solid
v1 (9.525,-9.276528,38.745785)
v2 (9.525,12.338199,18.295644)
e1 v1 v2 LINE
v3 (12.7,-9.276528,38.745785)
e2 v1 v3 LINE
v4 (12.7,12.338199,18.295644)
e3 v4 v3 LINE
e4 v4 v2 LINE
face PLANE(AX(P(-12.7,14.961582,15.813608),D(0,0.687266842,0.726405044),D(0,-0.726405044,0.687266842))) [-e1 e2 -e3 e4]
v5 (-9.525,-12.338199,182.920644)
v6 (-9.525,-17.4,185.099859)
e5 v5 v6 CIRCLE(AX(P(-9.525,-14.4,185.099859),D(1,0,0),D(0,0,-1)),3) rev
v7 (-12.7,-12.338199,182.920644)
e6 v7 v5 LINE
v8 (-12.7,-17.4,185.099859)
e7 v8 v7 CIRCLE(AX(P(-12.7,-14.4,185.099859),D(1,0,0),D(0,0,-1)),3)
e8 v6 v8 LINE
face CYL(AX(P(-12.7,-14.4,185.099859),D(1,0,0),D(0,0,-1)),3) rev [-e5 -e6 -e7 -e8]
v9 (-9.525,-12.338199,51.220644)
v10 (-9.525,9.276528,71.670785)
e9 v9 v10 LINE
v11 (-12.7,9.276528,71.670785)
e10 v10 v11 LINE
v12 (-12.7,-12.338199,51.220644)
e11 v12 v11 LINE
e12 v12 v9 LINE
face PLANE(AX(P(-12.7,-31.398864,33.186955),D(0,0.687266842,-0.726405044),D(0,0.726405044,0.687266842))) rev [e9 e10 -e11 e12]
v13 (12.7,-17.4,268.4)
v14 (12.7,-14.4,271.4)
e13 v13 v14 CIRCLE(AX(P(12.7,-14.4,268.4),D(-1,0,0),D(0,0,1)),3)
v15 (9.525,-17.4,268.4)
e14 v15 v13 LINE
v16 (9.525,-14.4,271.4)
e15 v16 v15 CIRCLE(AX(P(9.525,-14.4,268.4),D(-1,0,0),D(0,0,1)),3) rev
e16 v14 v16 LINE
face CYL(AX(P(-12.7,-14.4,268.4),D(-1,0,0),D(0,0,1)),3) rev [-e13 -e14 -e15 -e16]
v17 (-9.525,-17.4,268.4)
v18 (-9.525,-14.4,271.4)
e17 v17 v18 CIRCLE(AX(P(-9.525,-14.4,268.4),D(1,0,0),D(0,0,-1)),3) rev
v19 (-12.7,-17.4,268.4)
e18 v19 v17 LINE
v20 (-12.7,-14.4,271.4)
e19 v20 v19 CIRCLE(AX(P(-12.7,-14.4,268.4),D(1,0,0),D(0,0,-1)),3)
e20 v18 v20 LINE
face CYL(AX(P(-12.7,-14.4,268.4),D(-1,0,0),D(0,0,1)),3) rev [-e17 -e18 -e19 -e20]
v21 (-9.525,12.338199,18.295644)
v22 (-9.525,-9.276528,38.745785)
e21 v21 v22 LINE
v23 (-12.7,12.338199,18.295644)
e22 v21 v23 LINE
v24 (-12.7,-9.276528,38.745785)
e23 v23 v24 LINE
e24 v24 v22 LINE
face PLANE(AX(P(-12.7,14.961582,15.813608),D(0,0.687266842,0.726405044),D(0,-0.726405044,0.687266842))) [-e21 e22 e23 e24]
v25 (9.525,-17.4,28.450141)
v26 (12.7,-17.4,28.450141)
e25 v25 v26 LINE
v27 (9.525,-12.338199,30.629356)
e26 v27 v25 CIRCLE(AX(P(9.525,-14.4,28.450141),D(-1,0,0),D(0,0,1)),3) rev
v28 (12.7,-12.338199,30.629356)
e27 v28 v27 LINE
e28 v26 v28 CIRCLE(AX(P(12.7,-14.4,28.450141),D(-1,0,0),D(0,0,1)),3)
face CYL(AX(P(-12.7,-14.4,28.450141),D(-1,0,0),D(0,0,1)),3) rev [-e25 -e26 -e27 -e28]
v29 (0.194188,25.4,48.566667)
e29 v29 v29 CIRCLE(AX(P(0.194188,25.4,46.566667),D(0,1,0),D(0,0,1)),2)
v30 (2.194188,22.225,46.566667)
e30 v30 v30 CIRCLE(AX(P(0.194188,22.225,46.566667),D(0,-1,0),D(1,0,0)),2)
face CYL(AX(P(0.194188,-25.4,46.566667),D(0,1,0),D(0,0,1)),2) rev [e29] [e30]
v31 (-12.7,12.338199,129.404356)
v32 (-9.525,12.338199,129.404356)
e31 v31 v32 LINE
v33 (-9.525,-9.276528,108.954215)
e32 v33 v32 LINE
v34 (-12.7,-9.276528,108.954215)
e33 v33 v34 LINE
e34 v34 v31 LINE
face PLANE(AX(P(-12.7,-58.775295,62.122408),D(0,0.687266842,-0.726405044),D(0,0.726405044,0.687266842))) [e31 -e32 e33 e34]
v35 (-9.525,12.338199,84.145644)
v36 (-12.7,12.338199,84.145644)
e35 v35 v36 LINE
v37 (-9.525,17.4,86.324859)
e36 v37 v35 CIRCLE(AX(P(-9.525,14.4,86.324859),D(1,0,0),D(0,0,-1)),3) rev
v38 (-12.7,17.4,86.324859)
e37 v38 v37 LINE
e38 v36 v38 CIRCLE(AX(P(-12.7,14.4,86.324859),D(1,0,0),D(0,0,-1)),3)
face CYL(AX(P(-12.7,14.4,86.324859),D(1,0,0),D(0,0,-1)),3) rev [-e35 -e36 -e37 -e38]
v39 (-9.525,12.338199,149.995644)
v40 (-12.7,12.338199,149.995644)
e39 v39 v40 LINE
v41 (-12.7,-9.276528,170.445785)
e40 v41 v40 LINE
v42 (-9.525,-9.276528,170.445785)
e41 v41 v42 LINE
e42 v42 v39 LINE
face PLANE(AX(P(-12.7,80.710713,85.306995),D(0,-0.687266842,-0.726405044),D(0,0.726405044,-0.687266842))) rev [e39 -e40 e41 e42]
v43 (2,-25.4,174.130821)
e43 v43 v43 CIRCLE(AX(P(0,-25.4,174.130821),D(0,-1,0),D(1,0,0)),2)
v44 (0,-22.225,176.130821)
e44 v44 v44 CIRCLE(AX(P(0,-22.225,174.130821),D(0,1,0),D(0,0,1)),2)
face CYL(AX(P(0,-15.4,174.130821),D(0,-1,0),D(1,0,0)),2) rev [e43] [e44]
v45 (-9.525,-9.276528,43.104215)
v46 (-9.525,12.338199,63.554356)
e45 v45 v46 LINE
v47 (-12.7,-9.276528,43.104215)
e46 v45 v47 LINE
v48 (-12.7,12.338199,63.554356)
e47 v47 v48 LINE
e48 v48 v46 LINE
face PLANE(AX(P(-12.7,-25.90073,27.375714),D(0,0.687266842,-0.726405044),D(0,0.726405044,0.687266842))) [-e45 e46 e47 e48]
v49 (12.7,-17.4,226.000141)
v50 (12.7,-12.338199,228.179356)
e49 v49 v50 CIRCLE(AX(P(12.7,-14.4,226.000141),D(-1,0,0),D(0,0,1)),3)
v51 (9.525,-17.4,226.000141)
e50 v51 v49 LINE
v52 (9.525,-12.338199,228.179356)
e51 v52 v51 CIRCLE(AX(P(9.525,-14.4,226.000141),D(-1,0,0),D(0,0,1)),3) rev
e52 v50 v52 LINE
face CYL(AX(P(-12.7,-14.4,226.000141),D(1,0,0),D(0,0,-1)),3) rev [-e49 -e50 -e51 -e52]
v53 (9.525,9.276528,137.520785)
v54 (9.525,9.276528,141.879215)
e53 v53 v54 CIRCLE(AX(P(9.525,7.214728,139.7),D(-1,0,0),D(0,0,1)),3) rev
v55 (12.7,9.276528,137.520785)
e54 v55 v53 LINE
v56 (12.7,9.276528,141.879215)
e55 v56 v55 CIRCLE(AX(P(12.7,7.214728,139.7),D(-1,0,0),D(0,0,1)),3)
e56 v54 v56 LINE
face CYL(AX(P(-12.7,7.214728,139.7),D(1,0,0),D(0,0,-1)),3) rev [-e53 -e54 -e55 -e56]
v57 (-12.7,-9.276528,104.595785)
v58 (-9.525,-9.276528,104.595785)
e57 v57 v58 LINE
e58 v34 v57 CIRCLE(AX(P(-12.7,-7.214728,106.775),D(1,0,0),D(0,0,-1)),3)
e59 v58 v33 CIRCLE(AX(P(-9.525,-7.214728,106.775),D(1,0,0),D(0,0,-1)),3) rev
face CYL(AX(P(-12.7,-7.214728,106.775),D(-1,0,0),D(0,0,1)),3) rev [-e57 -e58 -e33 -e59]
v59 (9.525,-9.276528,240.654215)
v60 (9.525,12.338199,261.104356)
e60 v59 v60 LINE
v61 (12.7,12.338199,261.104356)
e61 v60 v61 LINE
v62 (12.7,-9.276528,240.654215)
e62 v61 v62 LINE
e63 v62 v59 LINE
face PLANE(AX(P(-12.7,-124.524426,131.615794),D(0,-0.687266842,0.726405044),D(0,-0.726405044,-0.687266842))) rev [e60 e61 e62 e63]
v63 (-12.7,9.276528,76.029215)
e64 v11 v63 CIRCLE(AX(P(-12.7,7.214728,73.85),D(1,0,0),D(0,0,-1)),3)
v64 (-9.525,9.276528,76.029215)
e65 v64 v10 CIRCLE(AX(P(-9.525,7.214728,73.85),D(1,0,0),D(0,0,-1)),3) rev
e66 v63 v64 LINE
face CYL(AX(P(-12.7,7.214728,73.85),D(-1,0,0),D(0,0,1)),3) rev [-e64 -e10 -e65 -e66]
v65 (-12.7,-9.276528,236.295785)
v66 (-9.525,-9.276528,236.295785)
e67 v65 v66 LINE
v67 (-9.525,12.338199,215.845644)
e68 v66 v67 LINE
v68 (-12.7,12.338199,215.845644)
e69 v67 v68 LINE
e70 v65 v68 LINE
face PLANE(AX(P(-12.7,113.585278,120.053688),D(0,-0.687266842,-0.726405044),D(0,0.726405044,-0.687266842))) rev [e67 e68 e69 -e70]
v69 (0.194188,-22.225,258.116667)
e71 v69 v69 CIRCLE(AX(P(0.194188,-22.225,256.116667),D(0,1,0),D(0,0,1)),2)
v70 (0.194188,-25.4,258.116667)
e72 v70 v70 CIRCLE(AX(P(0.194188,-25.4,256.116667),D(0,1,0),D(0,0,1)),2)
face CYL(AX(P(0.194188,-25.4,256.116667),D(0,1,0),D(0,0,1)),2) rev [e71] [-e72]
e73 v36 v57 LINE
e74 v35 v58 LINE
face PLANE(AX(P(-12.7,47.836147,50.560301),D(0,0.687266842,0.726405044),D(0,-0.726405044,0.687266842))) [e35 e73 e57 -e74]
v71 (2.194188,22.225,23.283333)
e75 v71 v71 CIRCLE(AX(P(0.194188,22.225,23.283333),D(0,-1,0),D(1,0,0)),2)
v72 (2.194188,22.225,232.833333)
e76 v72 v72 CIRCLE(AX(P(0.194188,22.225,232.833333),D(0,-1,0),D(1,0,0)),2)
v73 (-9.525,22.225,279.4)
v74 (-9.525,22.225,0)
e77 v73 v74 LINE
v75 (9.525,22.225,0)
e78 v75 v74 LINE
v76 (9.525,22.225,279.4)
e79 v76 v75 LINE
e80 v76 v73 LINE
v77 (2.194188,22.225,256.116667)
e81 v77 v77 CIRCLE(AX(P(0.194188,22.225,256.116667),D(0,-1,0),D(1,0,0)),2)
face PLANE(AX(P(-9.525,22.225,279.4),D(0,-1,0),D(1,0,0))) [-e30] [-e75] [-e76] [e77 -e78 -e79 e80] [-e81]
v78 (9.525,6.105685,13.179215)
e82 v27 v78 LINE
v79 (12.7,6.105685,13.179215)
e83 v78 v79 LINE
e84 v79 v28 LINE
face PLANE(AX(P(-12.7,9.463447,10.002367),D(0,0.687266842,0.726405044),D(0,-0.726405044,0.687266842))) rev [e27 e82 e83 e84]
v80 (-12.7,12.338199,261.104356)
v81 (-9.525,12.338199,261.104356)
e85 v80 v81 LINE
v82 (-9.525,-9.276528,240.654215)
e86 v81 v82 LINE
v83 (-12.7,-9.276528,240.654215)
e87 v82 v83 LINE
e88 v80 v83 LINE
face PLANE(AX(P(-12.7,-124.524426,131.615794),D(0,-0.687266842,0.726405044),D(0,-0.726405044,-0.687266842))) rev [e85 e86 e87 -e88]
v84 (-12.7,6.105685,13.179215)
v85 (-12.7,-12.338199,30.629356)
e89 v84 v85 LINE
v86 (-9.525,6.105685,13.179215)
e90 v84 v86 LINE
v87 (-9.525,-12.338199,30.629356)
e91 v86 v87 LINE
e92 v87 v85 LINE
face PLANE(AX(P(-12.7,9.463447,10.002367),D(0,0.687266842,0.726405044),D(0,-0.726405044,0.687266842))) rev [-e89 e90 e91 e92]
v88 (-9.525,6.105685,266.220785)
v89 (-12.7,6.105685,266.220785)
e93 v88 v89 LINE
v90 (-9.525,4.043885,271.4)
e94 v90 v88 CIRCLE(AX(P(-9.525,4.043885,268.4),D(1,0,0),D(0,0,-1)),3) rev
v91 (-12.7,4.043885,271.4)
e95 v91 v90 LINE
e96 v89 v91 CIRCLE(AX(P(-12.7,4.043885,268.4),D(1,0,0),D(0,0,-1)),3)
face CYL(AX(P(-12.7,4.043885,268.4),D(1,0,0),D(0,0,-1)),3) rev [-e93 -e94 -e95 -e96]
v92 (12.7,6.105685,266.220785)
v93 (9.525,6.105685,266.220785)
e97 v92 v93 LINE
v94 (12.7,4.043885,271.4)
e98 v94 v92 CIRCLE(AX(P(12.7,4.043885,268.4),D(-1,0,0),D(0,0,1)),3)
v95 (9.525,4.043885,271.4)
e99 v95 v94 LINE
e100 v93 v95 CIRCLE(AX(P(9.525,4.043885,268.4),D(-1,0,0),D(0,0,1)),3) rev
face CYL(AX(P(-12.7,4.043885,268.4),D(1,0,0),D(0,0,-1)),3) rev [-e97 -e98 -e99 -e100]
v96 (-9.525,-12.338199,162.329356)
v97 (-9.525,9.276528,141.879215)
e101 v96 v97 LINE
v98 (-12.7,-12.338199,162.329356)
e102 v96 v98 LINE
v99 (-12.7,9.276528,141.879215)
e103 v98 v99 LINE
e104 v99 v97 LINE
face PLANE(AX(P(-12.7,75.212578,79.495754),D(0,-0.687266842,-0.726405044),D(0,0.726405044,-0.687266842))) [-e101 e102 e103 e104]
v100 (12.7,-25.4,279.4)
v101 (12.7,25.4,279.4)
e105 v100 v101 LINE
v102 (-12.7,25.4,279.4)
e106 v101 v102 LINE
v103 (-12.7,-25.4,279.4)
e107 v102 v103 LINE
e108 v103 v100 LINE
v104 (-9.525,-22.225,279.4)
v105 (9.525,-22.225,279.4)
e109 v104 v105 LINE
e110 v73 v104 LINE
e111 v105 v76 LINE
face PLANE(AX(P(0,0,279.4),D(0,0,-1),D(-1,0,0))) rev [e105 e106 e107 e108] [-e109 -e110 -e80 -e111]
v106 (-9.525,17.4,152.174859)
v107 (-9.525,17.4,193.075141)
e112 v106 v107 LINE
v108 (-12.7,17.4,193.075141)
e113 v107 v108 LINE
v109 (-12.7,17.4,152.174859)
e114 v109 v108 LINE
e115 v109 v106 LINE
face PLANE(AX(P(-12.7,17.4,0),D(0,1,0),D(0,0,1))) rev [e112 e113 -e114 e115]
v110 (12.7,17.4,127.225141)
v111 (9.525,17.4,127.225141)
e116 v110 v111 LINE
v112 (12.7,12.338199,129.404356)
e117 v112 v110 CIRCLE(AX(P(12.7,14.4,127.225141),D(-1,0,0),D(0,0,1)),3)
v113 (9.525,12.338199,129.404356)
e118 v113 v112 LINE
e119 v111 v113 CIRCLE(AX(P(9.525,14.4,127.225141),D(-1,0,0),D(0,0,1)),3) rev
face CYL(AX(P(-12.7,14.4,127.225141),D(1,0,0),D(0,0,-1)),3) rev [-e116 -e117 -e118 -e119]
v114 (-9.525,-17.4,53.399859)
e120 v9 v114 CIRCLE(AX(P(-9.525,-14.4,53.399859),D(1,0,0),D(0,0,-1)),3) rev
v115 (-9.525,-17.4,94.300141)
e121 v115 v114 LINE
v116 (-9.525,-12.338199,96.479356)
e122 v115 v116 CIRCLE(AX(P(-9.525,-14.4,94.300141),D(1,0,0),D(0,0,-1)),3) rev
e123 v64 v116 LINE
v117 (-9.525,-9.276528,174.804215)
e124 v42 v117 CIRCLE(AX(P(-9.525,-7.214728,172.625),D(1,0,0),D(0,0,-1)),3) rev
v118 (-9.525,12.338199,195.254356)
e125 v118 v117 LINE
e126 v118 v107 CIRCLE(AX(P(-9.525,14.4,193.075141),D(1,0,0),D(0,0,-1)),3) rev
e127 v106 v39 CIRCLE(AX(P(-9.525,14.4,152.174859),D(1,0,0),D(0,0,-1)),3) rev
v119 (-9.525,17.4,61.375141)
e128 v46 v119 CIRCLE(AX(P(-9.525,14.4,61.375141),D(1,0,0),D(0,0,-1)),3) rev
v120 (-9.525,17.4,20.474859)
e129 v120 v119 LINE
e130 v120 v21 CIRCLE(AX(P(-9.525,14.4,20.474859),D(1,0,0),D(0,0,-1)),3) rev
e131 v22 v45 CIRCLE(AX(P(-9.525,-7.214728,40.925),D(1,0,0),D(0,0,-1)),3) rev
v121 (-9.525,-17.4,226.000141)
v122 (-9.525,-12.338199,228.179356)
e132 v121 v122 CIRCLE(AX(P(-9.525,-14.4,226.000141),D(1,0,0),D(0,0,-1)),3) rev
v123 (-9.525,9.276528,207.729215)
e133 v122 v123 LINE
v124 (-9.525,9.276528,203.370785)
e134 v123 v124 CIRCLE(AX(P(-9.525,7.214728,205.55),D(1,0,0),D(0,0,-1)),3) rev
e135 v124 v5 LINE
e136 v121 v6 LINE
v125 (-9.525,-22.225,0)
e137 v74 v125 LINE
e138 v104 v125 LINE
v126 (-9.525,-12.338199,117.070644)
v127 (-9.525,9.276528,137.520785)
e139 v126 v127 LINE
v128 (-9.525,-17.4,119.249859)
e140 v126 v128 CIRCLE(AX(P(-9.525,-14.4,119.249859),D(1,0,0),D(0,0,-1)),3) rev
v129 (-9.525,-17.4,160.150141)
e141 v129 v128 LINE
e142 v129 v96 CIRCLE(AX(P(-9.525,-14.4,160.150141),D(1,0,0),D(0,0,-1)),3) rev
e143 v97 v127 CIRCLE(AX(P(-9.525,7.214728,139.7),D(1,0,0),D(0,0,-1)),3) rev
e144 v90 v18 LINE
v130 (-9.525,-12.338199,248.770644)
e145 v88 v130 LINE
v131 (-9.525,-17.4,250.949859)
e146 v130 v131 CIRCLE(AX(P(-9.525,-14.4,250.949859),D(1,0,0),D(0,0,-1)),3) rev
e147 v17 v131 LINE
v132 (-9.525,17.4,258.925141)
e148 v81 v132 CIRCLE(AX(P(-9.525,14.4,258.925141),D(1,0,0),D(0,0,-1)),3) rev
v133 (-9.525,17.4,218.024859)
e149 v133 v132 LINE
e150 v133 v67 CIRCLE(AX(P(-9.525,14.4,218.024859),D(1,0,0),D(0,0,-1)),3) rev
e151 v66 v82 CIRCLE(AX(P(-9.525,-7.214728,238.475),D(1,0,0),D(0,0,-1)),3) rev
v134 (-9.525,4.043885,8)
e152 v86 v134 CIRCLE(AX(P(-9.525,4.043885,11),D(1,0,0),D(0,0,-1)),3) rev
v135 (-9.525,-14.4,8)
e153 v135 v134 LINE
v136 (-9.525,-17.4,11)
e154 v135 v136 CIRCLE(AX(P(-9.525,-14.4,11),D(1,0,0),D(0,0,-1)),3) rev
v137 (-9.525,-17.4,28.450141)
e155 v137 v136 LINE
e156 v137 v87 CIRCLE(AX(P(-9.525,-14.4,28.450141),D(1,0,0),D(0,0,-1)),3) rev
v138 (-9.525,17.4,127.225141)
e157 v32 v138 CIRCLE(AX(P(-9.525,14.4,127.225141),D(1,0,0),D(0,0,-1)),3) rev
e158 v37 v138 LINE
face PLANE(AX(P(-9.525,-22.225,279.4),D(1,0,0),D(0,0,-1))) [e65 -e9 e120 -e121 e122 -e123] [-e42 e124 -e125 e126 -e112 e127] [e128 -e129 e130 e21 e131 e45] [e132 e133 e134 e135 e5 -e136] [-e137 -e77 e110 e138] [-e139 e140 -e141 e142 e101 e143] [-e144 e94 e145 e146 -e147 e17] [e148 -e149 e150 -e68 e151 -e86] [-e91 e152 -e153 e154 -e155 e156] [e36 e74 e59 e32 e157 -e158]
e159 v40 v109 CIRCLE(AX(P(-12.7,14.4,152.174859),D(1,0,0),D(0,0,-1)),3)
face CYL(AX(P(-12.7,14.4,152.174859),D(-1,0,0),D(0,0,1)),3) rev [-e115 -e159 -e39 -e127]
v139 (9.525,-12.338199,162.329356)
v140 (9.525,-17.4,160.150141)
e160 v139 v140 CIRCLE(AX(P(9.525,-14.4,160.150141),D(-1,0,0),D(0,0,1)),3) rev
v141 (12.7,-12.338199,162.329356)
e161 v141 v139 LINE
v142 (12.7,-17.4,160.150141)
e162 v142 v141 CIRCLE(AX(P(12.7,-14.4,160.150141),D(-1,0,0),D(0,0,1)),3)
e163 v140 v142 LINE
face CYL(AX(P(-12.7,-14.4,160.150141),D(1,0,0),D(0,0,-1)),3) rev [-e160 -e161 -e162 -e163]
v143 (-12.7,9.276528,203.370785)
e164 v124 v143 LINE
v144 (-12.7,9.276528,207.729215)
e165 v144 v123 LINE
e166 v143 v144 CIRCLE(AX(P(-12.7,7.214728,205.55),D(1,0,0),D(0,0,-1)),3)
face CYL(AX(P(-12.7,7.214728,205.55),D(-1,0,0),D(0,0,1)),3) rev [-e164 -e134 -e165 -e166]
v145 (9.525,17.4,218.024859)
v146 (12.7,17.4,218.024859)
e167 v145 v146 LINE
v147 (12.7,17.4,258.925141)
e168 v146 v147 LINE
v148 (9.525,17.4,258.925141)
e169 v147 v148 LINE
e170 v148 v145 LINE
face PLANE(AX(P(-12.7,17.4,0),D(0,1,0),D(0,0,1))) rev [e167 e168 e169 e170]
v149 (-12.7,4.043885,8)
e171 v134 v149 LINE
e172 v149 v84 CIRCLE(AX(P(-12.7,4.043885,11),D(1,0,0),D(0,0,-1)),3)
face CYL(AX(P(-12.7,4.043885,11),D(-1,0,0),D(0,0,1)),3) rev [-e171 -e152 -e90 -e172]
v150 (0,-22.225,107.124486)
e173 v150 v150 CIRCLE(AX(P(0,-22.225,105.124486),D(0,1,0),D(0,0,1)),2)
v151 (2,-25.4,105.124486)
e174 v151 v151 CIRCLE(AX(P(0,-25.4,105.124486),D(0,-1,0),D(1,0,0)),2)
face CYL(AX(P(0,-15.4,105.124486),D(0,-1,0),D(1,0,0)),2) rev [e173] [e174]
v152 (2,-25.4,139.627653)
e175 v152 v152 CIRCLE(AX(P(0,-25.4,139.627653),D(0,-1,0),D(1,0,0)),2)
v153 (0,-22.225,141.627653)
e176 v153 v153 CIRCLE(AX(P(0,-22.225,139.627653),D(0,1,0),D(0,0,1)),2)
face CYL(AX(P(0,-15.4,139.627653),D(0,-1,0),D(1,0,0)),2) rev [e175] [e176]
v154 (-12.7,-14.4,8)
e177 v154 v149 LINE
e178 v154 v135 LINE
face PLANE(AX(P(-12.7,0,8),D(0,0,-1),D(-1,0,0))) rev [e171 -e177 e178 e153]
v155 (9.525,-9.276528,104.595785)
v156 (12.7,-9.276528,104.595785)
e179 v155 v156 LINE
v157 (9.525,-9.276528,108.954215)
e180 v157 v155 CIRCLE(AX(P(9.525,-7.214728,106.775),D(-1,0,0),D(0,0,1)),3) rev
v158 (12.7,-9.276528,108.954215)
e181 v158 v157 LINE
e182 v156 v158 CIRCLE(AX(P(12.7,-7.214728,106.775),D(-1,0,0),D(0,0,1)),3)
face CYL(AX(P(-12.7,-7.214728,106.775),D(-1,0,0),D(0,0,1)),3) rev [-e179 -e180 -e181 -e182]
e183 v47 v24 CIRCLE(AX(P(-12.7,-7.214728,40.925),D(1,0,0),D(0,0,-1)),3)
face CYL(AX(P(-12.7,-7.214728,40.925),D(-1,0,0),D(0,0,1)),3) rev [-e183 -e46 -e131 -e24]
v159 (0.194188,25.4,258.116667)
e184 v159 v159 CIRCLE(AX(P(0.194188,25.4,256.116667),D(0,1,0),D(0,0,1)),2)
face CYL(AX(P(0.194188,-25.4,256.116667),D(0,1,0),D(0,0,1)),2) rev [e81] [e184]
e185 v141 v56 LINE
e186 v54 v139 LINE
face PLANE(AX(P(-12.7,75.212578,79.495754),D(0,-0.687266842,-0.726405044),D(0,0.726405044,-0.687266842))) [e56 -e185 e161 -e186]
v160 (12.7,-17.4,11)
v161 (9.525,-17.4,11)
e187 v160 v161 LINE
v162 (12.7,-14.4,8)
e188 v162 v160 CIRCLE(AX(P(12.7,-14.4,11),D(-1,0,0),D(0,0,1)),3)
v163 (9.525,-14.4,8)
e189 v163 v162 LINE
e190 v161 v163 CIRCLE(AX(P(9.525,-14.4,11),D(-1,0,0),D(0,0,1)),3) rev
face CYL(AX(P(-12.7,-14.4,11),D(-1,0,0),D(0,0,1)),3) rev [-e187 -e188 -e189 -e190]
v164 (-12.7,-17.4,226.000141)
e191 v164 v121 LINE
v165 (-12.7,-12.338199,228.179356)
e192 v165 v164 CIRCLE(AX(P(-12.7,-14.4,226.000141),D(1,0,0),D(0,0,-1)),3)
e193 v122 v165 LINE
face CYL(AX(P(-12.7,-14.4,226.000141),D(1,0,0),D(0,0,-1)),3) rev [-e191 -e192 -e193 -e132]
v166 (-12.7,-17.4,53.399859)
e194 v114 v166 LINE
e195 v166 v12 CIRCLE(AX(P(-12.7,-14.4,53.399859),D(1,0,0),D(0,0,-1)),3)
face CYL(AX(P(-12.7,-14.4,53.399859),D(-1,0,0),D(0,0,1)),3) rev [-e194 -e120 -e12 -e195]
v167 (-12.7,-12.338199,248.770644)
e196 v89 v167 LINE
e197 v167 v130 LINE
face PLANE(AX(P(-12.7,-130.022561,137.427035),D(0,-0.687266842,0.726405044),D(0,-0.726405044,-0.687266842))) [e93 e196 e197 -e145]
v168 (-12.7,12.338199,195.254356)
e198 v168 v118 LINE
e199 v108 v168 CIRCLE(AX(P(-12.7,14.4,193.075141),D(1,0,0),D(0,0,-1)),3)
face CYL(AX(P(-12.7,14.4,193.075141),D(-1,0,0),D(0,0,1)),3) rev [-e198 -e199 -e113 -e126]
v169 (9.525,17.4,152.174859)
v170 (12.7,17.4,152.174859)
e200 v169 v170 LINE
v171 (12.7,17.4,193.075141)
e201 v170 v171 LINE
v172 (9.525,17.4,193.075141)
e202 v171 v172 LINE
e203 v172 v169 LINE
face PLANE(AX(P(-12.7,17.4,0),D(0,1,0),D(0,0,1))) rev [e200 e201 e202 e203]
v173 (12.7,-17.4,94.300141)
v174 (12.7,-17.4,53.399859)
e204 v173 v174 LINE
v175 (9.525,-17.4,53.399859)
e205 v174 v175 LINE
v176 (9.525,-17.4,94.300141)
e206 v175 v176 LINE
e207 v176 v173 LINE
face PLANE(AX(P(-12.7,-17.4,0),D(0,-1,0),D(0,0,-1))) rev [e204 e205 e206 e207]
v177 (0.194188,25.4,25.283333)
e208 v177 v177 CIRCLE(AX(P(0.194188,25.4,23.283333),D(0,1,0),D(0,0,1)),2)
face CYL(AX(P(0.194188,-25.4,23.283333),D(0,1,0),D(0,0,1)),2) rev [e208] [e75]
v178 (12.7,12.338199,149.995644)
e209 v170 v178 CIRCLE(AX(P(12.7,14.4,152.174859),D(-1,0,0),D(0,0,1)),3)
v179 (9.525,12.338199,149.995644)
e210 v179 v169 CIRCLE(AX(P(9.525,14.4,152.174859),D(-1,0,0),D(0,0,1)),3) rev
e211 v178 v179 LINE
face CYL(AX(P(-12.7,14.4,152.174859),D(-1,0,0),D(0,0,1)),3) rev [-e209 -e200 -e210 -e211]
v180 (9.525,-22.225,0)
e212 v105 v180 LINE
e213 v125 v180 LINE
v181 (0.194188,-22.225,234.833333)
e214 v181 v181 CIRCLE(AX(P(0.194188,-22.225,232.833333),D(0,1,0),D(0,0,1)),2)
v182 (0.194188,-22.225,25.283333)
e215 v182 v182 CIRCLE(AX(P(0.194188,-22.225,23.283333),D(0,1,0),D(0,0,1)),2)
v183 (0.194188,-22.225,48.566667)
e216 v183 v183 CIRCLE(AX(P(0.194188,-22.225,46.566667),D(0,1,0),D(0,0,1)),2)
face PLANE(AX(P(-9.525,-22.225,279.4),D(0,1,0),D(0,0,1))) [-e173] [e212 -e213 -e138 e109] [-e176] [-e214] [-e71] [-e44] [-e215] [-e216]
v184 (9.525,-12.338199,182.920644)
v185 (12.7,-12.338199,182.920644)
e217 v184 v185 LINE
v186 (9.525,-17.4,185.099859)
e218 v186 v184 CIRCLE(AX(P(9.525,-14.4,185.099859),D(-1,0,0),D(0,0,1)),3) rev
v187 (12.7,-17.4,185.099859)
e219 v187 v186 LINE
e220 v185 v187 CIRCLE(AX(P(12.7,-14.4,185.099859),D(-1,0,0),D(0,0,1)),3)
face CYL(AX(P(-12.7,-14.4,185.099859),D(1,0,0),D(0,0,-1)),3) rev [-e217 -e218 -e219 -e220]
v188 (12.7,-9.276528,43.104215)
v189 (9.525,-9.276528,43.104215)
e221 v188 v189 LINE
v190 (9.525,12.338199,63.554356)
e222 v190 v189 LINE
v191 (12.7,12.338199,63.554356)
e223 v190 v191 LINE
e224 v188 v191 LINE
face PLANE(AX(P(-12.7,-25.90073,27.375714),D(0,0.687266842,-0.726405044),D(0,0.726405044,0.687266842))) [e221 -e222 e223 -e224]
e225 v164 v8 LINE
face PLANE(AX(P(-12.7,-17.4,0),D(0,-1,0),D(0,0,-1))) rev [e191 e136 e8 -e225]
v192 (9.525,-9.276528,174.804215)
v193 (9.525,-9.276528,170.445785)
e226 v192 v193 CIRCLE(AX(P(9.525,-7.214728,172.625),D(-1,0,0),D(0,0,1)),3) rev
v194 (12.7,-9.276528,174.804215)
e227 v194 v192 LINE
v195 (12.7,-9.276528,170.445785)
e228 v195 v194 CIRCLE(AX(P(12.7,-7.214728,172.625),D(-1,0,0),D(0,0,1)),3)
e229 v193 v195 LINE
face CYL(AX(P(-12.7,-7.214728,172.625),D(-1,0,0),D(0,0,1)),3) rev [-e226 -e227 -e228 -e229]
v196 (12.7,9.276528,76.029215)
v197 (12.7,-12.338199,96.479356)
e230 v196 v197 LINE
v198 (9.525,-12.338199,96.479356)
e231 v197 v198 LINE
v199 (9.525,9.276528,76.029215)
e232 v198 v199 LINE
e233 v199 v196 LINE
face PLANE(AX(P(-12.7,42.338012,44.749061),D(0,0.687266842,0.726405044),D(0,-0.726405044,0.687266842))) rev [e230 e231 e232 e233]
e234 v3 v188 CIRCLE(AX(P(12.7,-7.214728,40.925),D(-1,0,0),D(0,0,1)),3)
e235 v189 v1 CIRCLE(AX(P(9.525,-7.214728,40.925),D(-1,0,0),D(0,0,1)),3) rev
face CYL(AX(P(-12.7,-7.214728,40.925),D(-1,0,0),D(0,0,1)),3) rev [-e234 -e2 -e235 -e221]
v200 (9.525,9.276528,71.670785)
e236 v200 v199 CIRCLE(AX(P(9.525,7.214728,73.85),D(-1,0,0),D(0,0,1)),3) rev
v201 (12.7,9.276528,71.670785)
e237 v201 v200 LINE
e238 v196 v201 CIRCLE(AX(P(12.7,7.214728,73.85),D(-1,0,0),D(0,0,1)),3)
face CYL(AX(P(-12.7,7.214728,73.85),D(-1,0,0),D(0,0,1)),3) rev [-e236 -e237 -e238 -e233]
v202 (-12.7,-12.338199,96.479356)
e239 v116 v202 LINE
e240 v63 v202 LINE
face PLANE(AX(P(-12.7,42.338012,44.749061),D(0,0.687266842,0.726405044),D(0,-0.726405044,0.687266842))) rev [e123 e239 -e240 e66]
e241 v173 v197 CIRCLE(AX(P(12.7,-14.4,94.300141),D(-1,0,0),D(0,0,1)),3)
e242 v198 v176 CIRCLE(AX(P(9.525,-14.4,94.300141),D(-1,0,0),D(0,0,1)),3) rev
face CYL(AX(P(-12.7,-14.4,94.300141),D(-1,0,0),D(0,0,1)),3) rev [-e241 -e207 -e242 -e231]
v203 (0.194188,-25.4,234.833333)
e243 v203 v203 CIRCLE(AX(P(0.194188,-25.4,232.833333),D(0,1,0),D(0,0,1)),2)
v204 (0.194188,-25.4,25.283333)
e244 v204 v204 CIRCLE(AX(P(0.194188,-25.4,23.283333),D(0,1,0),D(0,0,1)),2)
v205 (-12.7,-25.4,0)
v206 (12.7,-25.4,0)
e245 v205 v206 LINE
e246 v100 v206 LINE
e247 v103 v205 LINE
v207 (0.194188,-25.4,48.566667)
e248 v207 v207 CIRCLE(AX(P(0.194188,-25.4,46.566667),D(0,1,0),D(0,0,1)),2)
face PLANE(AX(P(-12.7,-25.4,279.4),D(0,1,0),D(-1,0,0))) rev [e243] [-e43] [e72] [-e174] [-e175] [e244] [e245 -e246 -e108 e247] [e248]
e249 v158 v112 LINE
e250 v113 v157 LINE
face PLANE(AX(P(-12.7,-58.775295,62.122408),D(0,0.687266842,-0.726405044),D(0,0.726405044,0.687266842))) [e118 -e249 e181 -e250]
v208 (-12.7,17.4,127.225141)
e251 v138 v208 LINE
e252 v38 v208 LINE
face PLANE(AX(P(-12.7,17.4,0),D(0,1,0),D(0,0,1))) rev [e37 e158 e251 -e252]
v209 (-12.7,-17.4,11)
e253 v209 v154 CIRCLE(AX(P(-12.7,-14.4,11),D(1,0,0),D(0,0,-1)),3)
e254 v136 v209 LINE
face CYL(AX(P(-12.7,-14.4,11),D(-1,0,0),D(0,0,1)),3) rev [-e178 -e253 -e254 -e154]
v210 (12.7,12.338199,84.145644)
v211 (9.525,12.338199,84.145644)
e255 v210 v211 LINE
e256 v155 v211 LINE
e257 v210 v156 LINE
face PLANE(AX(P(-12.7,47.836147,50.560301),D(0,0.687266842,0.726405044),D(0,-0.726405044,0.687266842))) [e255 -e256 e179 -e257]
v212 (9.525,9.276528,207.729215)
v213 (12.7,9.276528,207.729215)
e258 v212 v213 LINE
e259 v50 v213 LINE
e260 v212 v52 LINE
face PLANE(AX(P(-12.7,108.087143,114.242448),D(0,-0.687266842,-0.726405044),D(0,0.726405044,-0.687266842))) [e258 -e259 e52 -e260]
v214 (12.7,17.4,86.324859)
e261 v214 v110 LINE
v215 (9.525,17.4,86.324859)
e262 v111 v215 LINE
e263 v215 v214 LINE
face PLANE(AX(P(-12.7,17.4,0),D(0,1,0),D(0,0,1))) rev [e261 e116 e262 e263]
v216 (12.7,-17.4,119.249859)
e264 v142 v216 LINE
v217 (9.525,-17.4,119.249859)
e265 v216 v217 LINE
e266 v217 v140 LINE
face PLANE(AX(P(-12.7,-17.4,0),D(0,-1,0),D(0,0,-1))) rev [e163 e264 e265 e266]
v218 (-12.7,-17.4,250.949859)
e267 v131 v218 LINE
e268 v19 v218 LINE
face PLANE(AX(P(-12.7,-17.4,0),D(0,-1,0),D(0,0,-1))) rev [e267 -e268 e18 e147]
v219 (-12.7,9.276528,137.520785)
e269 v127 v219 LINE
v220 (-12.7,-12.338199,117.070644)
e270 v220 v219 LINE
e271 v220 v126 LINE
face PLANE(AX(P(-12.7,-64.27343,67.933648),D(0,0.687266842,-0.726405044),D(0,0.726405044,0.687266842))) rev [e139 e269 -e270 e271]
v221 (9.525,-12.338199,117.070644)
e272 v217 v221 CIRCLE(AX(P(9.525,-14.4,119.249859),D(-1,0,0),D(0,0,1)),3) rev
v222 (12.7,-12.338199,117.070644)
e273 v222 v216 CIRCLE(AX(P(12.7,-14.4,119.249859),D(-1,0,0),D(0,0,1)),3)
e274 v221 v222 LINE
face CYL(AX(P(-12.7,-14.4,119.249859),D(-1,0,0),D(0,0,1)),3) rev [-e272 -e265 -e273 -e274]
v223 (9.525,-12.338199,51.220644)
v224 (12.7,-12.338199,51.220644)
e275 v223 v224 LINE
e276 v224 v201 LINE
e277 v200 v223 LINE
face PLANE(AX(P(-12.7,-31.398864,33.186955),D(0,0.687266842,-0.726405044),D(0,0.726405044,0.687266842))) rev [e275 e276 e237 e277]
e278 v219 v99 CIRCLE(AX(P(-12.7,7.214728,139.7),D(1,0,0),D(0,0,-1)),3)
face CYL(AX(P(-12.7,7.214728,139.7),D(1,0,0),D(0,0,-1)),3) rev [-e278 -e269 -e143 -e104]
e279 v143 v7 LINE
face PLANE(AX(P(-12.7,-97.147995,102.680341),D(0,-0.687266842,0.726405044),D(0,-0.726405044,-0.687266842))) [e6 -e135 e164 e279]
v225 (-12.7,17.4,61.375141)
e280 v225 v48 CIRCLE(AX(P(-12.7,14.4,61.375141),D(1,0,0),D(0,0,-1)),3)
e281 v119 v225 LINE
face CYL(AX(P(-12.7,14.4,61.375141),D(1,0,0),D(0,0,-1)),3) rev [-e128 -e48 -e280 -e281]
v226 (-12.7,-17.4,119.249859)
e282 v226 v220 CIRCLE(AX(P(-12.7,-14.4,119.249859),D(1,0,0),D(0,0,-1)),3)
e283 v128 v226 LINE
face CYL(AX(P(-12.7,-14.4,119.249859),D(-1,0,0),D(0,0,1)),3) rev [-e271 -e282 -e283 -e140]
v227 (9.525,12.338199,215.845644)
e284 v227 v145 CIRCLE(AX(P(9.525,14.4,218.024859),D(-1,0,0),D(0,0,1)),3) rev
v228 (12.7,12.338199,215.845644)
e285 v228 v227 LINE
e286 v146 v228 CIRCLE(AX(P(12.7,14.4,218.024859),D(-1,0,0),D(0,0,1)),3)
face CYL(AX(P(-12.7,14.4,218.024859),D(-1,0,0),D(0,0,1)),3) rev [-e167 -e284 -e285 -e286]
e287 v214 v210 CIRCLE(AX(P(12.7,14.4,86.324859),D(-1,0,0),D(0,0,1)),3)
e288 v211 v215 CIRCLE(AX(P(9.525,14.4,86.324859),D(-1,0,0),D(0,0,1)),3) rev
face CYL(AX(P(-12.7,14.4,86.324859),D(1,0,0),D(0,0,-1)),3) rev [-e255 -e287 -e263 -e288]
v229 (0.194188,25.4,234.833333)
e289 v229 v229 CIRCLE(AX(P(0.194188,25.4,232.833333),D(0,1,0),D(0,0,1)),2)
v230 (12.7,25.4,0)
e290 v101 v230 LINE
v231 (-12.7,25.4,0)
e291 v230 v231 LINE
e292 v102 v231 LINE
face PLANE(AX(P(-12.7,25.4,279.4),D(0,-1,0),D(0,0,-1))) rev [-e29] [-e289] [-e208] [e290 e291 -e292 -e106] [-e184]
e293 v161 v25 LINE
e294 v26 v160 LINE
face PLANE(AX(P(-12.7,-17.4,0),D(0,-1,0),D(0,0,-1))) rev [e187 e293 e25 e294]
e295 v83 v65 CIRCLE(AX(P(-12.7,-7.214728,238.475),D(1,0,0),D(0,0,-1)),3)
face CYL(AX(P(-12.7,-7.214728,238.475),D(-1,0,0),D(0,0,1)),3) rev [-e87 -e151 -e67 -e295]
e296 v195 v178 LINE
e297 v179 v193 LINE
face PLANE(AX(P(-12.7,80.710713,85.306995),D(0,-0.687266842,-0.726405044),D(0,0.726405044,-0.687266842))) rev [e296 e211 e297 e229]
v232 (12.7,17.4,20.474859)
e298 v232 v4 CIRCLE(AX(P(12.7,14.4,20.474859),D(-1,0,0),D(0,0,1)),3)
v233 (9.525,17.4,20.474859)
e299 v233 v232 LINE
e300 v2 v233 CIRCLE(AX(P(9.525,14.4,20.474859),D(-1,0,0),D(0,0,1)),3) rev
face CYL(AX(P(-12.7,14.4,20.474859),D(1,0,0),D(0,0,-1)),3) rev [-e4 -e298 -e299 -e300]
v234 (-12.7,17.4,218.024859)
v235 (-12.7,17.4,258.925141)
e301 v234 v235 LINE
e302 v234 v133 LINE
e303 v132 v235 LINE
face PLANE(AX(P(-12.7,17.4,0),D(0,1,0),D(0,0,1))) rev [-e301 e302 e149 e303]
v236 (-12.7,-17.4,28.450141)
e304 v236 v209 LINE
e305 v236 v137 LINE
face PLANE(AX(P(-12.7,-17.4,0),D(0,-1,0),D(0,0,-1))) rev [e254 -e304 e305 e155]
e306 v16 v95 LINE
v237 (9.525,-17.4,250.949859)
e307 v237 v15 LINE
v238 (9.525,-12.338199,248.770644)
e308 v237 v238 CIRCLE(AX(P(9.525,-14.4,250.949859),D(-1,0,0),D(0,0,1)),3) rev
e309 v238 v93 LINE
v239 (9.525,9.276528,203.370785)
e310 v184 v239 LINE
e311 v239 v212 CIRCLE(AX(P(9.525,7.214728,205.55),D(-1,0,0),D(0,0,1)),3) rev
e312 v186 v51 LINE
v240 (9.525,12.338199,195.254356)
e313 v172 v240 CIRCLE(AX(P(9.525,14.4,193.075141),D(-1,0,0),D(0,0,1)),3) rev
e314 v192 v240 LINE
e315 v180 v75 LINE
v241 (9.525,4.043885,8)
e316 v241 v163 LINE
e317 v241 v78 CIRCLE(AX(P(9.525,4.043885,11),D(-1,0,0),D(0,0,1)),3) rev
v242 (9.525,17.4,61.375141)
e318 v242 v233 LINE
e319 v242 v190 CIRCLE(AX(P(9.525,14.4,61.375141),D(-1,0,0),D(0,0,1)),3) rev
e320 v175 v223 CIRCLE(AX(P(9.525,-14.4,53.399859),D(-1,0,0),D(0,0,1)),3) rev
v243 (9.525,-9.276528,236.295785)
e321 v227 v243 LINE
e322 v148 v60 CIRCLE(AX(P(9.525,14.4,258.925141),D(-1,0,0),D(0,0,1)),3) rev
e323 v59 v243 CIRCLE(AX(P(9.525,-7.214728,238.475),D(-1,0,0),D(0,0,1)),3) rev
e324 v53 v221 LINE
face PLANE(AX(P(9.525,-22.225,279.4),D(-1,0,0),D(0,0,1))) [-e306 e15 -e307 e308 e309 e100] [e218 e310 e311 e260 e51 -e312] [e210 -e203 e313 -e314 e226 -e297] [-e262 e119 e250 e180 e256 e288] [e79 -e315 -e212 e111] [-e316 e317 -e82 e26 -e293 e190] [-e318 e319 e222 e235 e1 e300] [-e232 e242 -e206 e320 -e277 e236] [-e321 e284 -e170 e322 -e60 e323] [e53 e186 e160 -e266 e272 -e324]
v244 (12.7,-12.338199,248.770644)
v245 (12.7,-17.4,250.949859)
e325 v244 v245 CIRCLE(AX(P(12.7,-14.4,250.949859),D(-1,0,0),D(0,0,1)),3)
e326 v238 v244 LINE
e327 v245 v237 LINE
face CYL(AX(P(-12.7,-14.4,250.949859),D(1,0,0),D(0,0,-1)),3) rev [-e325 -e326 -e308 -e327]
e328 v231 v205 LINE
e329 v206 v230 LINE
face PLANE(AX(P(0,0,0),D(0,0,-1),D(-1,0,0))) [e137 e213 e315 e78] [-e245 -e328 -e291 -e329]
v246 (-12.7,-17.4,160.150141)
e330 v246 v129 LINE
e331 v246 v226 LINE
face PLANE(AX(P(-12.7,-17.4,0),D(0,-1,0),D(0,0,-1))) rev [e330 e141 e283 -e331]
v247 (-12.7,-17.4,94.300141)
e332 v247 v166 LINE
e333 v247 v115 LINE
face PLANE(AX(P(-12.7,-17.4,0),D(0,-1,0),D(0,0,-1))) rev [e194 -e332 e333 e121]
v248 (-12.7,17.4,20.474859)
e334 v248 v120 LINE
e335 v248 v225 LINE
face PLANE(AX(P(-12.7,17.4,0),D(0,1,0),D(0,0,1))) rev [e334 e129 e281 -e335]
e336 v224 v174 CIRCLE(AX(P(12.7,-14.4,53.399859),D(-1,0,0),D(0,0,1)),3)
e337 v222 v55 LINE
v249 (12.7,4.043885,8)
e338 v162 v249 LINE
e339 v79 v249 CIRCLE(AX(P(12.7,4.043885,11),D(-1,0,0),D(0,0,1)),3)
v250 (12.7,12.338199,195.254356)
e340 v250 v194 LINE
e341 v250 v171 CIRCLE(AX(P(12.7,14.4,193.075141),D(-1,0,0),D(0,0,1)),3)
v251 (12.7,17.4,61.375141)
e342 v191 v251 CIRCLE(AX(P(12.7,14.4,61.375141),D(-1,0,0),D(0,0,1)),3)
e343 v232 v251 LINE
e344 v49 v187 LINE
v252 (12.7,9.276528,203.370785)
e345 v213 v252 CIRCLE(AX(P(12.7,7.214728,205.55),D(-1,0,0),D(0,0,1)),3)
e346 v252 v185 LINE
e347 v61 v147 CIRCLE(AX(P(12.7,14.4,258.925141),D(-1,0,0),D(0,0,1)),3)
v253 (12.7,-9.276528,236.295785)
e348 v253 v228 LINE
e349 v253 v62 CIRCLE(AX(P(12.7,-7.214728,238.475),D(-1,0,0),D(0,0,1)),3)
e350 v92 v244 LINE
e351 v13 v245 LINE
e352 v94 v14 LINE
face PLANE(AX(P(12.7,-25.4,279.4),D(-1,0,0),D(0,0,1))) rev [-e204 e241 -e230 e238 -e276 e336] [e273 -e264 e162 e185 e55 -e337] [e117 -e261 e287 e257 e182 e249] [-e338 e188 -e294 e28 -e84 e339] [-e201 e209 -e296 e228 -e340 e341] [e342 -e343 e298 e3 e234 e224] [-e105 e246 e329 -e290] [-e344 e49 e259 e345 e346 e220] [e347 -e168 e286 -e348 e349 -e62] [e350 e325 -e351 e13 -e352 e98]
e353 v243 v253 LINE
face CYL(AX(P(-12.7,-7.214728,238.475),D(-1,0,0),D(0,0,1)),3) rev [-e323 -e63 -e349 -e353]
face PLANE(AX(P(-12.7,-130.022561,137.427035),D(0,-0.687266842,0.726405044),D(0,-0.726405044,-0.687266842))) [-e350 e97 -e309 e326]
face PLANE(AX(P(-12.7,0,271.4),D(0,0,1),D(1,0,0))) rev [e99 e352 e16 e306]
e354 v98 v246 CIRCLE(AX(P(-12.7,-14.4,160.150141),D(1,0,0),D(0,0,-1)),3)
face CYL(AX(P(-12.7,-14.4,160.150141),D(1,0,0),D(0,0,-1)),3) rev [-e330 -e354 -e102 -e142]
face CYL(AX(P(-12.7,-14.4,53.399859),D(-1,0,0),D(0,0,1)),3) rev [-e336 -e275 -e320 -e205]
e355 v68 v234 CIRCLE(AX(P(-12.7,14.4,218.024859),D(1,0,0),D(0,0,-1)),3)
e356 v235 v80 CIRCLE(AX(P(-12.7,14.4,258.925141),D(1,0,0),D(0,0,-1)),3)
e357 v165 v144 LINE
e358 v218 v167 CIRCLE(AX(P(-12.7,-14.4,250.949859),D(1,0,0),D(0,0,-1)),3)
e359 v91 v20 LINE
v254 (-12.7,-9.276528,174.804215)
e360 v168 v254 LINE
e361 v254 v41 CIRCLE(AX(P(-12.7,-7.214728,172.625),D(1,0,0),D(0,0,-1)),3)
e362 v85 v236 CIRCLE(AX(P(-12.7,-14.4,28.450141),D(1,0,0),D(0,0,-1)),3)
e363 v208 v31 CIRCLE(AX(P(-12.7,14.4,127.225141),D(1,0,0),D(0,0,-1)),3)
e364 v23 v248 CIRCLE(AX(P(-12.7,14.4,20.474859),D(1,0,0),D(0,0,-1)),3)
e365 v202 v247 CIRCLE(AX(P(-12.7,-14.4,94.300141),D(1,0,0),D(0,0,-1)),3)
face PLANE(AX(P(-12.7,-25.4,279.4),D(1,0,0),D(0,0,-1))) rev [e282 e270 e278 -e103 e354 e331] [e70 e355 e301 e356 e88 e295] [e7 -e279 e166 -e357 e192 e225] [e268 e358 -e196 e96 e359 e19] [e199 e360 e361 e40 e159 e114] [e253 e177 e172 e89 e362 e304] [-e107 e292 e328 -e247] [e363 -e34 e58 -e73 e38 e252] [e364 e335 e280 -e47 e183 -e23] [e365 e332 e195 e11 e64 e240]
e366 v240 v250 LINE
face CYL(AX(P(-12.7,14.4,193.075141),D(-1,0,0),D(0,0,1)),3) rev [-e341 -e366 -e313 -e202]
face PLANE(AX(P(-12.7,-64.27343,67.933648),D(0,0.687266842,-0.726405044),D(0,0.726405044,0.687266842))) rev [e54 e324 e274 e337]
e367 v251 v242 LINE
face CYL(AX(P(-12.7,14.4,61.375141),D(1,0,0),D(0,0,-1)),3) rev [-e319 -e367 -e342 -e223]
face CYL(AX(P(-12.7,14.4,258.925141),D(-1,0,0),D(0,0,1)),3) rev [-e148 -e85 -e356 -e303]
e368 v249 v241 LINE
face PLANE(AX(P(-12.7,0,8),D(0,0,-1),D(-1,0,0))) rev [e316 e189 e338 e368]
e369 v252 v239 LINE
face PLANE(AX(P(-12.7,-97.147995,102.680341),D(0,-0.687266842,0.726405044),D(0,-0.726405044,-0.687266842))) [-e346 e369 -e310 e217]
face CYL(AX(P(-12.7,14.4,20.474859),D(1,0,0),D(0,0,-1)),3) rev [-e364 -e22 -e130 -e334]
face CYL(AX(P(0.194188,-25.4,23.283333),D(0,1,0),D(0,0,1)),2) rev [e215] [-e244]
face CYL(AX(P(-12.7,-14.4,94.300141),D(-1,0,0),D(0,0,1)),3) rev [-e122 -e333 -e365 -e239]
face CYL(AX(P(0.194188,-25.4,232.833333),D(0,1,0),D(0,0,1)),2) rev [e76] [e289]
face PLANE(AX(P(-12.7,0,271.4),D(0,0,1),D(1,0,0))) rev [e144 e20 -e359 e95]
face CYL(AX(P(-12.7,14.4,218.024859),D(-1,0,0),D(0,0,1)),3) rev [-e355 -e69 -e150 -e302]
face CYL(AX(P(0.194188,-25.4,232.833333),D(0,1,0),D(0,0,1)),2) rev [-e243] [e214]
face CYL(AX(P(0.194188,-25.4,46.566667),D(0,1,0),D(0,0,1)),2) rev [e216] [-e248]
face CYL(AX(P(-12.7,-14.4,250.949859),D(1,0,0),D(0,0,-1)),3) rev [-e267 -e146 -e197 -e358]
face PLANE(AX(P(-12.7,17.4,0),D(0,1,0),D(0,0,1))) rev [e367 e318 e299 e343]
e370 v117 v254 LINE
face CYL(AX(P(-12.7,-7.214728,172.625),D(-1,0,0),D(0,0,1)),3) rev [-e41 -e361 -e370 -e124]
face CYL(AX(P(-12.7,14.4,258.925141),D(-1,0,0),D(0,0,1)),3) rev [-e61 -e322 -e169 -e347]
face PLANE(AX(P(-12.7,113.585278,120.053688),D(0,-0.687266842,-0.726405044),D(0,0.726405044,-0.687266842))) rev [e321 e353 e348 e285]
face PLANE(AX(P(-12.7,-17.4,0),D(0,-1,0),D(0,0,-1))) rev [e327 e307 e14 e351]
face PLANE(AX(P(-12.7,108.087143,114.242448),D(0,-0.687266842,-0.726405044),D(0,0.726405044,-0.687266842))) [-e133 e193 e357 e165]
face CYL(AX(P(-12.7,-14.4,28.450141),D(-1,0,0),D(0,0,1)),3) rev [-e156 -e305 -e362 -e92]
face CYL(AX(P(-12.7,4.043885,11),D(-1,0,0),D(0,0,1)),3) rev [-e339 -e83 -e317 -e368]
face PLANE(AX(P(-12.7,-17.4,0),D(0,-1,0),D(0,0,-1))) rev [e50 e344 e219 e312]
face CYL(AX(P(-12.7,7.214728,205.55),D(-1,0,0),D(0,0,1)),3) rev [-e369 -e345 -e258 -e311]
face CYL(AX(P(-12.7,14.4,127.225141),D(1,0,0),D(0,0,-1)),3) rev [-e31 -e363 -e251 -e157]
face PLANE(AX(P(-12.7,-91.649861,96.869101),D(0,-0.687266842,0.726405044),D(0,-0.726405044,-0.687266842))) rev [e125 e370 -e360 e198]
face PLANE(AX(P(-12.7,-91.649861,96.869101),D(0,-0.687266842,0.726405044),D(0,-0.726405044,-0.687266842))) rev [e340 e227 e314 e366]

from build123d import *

# Parameters (mm, degrees)
SKETCH1_W           = 25.4
SKETCH1_H           = 50.8
SKETCH1_W_2         = 19.05
SKETCH1_H_2         = 44.45
BOSS_EXTRUDE1_DEPTH = 279.4
CUT_EXTRUDE1_DEPTH  = 282.699627263
FILLET1_R           = 3
MIRROR2_START       = -12.7
MIRROR2_DEPTH       = 3.175
SKETCH4_R           = 2
CUT_EXTRUDE2_DEPTH  = 285.264471927
SKETCH5_R           = 2
CUT_EXTRUDE3_DEPTH  = 10


# Read off the part's stored shape, not the designer's step: Mirror2
with BuildPart() as part:
    # Sketch1 → Boss-Extrude1 (new body)
    with BuildSketch(Plane.XY):
        Rectangle(SKETCH1_W, SKETCH1_H)
        Rectangle(SKETCH1_W_2, SKETCH1_H_2, mode=Mode.SUBTRACT)
    extrude(amount=BOSS_EXTRUDE1_DEPTH)

    # Sketch3 → Cut-Extrude1 (cut, through all)
    with BuildSketch(Plane(origin=(12.7, 0, 0), x_dir=(0, 0, -1), z_dir=(1, 0, 0))):
        Polygon((-271.4, -17.4), (-243.98156969, -17.4), (-271.4, 11.579844337), align=None)
        Polygon((-238.475, -11.579844337), (-211.05656969, 17.4), (-265.89343031, 17.4), align=None)
        Polygon((-232.96843031, -17.4), (-178.13156969, -17.4), (-205.55, 11.579844337), align=None)
        Polygon((-172.625, -11.579844337), (-145.20656969, 17.4), (-200.04343031, 17.4), align=None)
        Polygon((-139.7, -17.4), (-139.7, 11.579844337), (-167.11843031, -17.4), align=None)
        Polygon((-139.7, -17.4), (-112.28156969, -17.4), (-139.7, 11.579844337), align=None)
        Polygon((-79.35656969, 17.4), (-134.19343031, 17.4), (-106.775, -11.579844337), align=None)
        Polygon((-73.85, 11.579844337), (-101.26843031, -17.4), (-46.43156969, -17.4), align=None)
        Polygon((-13.50656969, 17.4), (-68.34343031, 17.4), (-40.925, -11.579844337), align=None)
        Polygon((-8, 11.579844337), (-35.41843031, -17.4), (-8, -17.4), align=None)
    extrude(amount=-CUT_EXTRUDE1_DEPTH, mode=Mode.SUBTRACT)

    # Fillet1
    fillet1_edges = [part.edges().sort_by_distance(p)[0] for p in [
        (11.1125, -17.4, 167.11843031),
        (11.1125, 11.579844337, 139.7),
        (11.1125, -17.4, 112.28156969),
        (11.1125, -11.579844337, 238.475),
        (11.1125, 17.4, 265.89343031),
        (11.1125, 17.4, 211.05656969),
        (11.1125, 11.579844337, 205.55),
        (11.1125, -17.4, 178.13156969),
        (11.1125, -17.4, 232.96843031),
        (11.1125, 17.4, 13.50656969),
        (11.1125, -11.579844337, 40.925),
        (11.1125, 17.4, 68.34343031),
        (11.1125, 11.579844337, 8),
        (11.1125, -17.4, 8),
        (11.1125, -17.4, 35.41843031),
        (11.1125, 17.4, 79.35656969),
        (11.1125, -11.579844337, 106.775),
        (11.1125, 17.4, 134.19343031),
        (11.1125, -17.4, 46.43156969),
        (11.1125, -17.4, 101.26843031),
        (11.1125, 11.579844337, 73.85),
        (11.1125, 11.579844337, 271.4),
        (11.1125, -17.4, 243.98156969),
        (11.1125, -17.4, 271.4),
        (11.1125, -11.579844337, 172.625),
        (11.1125, 17.4, 200.04343031),
        (11.1125, 17.4, 145.20656969),
    ]]
    fillet(fillet1_edges, radius=FILLET1_R)

    # Mirror2 outline → Mirror2 (add)
    with BuildSketch(Plane.YZ.offset(MIRROR2_START)):
        with BuildLine():
            Line((-17.4, 35.41843031), (-17.4, 28.450140974))
            ThreePointArc((-17.4, 28.450140974), (-15.586296427, 31.205626555), (-12.338199475, 30.629356107))
            Line((-12.338199475, 30.629356107), (-17.4, 35.41843031))
        make_face()
        with BuildLine():
            ThreePointArc((-14.4, 8), (-16.521320344, 8.878679656), (-17.4, 11))
            Line((-17.4, 11), (-17.4, 8))
            Line((-17.4, 8), (-14.4, 8))
        make_face()
        with BuildLine():
            Line((11.579844337, 8), (6.105685289, 13.179215133))
            ThreePointArc((6.105685289, 13.179215133), (6.831145553, 9.890415708), (4.043884765, 8))
            Line((4.043884765, 8), (11.579844337, 8))
        make_face()
        with BuildLine():
            ThreePointArc((17.4, 20.474859026), (15.586296427, 17.719373445), (12.338199475, 18.295643893))
            Line((12.338199475, 18.295643893), (17.4, 13.50656969))
            Line((17.4, 13.50656969), (17.4, 20.474859026))
        make_face()
        with BuildLine():
            Line((-11.579844337, 40.925), (-9.276528114, 38.745784867))
            ThreePointArc((-9.276528114, 38.745784867), (-10.214727589, 40.925), (-9.276528114, 43.104215133))
            Line((-9.276528114, 43.104215133), (-11.579844337, 40.925))
        make_face()
        with BuildLine():
            ThreePointArc((12.338199475, 63.554356107), (15.586296427, 64.130626555), (17.4, 61.375140974))
            Line((17.4, 61.375140974), (17.4, 68.34343031))
            Line((17.4, 68.34343031), (12.338199475, 63.554356107))
        make_face()
        with BuildLine():
            Line((-17.4, 101.26843031), (-17.4, 94.300140974))
            ThreePointArc((-17.4, 94.300140974), (-15.586296427, 97.055626555), (-12.338199475, 96.479356107))
            Line((-12.338199475, 96.479356107), (-17.4, 101.26843031))
        make_face()
        with BuildLine():
            ThreePointArc((-12.338199475, 51.220643893), (-15.586296427, 50.644373445), (-17.4, 53.399859026))
            Line((-17.4, 53.399859026), (-17.4, 46.43156969))
            Line((-17.4, 46.43156969), (-12.338199475, 51.220643893))
        make_face()
        with BuildLine():
            Line((11.579844337, 73.85), (9.276528114, 76.029215133))
            ThreePointArc((9.276528114, 76.029215133), (10.214727589, 73.85), (9.276528114, 71.670784867))
            Line((9.276528114, 71.670784867), (11.579844337, 73.85))
        make_face()
        with BuildLine():
            Line((-11.579844337, 106.775), (-9.276528114, 104.595784867))
            ThreePointArc((-9.276528114, 104.595784867), (-10.214727589, 106.775), (-9.276528114, 108.954215133))
            Line((-9.276528114, 108.954215133), (-11.579844337, 106.775))
        make_face()
        with BuildLine():
            ThreePointArc((17.4, 86.324859026), (15.586296427, 83.569373445), (12.338199475, 84.145643893))
            Line((12.338199475, 84.145643893), (17.4, 79.35656969))
            Line((17.4, 79.35656969), (17.4, 86.324859026))
        make_face()
        with BuildLine():
            Line((17.4, 134.19343031), (12.338199475, 129.404356107))
            ThreePointArc((12.338199475, 129.404356107), (15.586296427, 129.980626555), (17.4, 127.225140974))
            Line((17.4, 127.225140974), (17.4, 134.19343031))
        make_face()
        with BuildLine():
            Line((-17.4, 112.28156969), (-12.338199475, 117.070643893))
            ThreePointArc((-12.338199475, 117.070643893), (-15.586296427, 116.494373445), (-17.4, 119.249859026))
            Line((-17.4, 119.249859026), (-17.4, 112.28156969))
        make_face()
        with BuildLine():
            ThreePointArc((9.276528114, 141.879215133), (10.214727589, 139.7), (9.276528114, 137.520784867))
            Line((9.276528114, 137.520784867), (11.579844337, 139.7))
            Line((11.579844337, 139.7), (9.276528114, 141.879215133))
        make_face()
        with BuildLine():
            Line((-17.4, 167.11843031), (-17.4, 160.150140974))
            ThreePointArc((-17.4, 160.150140974), (-15.586296427, 162.905626555), (-12.338199475, 162.329356107))
            Line((-12.338199475, 162.329356107), (-17.4, 167.11843031))
        make_face()
        with BuildLine():
            Line((17.4, 145.20656969), (17.4, 152.174859026))
            ThreePointArc((17.4, 152.174859026), (15.586296427, 149.419373445), (12.338199475, 149.995643893))
            Line((12.338199475, 149.995643893), (17.4, 145.20656969))
        make_face()
        with BuildLine():
            ThreePointArc((12.338199475, 195.254356107), (15.586296427, 195.830626555), (17.4, 193.075140974))
            Line((17.4, 193.075140974), (17.4, 200.04343031))
            Line((17.4, 200.04343031), (12.338199475, 195.254356107))
        make_face()
        with BuildLine():
            Line((-11.579844337, 172.625), (-9.276528114, 170.445784867))
            ThreePointArc((-9.276528114, 170.445784867), (-10.214727589, 172.625), (-9.276528114, 174.804215133))
            Line((-9.276528114, 174.804215133), (-11.579844337, 172.625))
        make_face()
        with BuildLine():
            ThreePointArc((-12.338199475, 182.920643893), (-15.586296427, 182.344373445), (-17.4, 185.099859026))
            Line((-17.4, 185.099859026), (-17.4, 178.13156969))
            Line((-17.4, 178.13156969), (-12.338199475, 182.920643893))
        make_face()
        with BuildLine():
            Line((-17.4, 232.96843031), (-17.4, 226.000140974))
            ThreePointArc((-17.4, 226.000140974), (-15.586296427, 228.755626555), (-12.338199475, 228.179356107))
            Line((-12.338199475, 228.179356107), (-17.4, 232.96843031))
        make_face()
        with BuildLine():
            ThreePointArc((9.276528114, 207.729215133), (10.214727589, 205.55), (9.276528114, 203.370784867))
            Line((9.276528114, 203.370784867), (11.579844337, 205.55))
            Line((11.579844337, 205.55), (9.276528114, 207.729215133))
        make_face()
        with BuildLine():
            Line((-11.579844337, 238.475), (-9.276528114, 236.295784867))
            ThreePointArc((-9.276528114, 236.295784867), (-10.214727589, 238.475), (-9.276528114, 240.654215133))
            Line((-9.276528114, 240.654215133), (-11.579844337, 238.475))
        make_face()
        with BuildLine():
            ThreePointArc((17.4, 218.024859026), (15.586296427, 215.269373445), (12.338199475, 215.845643893))
            Line((12.338199475, 215.845643893), (17.4, 211.05656969))
            Line((17.4, 211.05656969), (17.4, 218.024859026))
        make_face()
        with BuildLine():
            Line((17.4, 265.89343031), (12.338199475, 261.104356107))
            ThreePointArc((12.338199475, 261.104356107), (15.586296427, 261.680626555), (17.4, 258.925140974))
            Line((17.4, 258.925140974), (17.4, 265.89343031))
        make_face()
        with BuildLine():
            ThreePointArc((-12.338199475, 248.770643893), (-15.586296427, 248.194373445), (-17.4, 250.949859026))
            Line((-17.4, 250.949859026), (-17.4, 243.98156969))
            Line((-17.4, 243.98156969), (-12.338199475, 248.770643893))
        make_face()
        with BuildLine():
            Line((-17.4, 271.4), (-17.4, 268.4))
            ThreePointArc((-17.4, 268.4), (-16.521320344, 270.521320344), (-14.4, 271.4))
            Line((-14.4, 271.4), (-17.4, 271.4))
        make_face()
        with BuildLine():
            ThreePointArc((4.043884765, 271.4), (6.831145553, 269.509584292), (6.105685289, 266.220784867))
            Line((6.105685289, 266.220784867), (11.579844337, 271.4))
            Line((11.579844337, 271.4), (4.043884765, 271.4))
        make_face()
    extrude(amount=MIRROR2_DEPTH)

    # Sketch4 → Cut-Extrude2 (cut, through all)
    with BuildSketch(Plane(origin=(0, 25.4, 0), x_dir=(1, 0, 0), z_dir=(0, 1, 0))):
        with Locations(Location((0.194187774, -256.116666667, 0), (0, 0, 270))):
            Circle(SKETCH4_R)
        with Locations(Location((0.194187774, -232.833333333, 0), (0, 0, 270))):
            Circle(SKETCH4_R)
        with Locations(Location((0.194187774, -23.283333333, 0), (0, 0, 270))):
            Circle(SKETCH4_R)
        with Locations(Location((0.194187774, -46.566666667, 0), (0, 0, 270))):
            Circle(SKETCH4_R)
    extrude(amount=-CUT_EXTRUDE2_DEPTH, mode=Mode.SUBTRACT)

    # Sketch5 → Cut-Extrude3 (cut)
    with BuildSketch(Plane.XZ.offset(25.4)):
        with Locations((0, 174.130820965)):
            Circle(SKETCH5_R)
        with Locations((0, 139.627653329)):
            Circle(SKETCH5_R)
        with Locations((0, 105.124485692)):
            Circle(SKETCH5_R)
    extrude(amount=-CUT_EXTRUDE3_DEPTH, mode=Mode.SUBTRACT)


solid = part.part
